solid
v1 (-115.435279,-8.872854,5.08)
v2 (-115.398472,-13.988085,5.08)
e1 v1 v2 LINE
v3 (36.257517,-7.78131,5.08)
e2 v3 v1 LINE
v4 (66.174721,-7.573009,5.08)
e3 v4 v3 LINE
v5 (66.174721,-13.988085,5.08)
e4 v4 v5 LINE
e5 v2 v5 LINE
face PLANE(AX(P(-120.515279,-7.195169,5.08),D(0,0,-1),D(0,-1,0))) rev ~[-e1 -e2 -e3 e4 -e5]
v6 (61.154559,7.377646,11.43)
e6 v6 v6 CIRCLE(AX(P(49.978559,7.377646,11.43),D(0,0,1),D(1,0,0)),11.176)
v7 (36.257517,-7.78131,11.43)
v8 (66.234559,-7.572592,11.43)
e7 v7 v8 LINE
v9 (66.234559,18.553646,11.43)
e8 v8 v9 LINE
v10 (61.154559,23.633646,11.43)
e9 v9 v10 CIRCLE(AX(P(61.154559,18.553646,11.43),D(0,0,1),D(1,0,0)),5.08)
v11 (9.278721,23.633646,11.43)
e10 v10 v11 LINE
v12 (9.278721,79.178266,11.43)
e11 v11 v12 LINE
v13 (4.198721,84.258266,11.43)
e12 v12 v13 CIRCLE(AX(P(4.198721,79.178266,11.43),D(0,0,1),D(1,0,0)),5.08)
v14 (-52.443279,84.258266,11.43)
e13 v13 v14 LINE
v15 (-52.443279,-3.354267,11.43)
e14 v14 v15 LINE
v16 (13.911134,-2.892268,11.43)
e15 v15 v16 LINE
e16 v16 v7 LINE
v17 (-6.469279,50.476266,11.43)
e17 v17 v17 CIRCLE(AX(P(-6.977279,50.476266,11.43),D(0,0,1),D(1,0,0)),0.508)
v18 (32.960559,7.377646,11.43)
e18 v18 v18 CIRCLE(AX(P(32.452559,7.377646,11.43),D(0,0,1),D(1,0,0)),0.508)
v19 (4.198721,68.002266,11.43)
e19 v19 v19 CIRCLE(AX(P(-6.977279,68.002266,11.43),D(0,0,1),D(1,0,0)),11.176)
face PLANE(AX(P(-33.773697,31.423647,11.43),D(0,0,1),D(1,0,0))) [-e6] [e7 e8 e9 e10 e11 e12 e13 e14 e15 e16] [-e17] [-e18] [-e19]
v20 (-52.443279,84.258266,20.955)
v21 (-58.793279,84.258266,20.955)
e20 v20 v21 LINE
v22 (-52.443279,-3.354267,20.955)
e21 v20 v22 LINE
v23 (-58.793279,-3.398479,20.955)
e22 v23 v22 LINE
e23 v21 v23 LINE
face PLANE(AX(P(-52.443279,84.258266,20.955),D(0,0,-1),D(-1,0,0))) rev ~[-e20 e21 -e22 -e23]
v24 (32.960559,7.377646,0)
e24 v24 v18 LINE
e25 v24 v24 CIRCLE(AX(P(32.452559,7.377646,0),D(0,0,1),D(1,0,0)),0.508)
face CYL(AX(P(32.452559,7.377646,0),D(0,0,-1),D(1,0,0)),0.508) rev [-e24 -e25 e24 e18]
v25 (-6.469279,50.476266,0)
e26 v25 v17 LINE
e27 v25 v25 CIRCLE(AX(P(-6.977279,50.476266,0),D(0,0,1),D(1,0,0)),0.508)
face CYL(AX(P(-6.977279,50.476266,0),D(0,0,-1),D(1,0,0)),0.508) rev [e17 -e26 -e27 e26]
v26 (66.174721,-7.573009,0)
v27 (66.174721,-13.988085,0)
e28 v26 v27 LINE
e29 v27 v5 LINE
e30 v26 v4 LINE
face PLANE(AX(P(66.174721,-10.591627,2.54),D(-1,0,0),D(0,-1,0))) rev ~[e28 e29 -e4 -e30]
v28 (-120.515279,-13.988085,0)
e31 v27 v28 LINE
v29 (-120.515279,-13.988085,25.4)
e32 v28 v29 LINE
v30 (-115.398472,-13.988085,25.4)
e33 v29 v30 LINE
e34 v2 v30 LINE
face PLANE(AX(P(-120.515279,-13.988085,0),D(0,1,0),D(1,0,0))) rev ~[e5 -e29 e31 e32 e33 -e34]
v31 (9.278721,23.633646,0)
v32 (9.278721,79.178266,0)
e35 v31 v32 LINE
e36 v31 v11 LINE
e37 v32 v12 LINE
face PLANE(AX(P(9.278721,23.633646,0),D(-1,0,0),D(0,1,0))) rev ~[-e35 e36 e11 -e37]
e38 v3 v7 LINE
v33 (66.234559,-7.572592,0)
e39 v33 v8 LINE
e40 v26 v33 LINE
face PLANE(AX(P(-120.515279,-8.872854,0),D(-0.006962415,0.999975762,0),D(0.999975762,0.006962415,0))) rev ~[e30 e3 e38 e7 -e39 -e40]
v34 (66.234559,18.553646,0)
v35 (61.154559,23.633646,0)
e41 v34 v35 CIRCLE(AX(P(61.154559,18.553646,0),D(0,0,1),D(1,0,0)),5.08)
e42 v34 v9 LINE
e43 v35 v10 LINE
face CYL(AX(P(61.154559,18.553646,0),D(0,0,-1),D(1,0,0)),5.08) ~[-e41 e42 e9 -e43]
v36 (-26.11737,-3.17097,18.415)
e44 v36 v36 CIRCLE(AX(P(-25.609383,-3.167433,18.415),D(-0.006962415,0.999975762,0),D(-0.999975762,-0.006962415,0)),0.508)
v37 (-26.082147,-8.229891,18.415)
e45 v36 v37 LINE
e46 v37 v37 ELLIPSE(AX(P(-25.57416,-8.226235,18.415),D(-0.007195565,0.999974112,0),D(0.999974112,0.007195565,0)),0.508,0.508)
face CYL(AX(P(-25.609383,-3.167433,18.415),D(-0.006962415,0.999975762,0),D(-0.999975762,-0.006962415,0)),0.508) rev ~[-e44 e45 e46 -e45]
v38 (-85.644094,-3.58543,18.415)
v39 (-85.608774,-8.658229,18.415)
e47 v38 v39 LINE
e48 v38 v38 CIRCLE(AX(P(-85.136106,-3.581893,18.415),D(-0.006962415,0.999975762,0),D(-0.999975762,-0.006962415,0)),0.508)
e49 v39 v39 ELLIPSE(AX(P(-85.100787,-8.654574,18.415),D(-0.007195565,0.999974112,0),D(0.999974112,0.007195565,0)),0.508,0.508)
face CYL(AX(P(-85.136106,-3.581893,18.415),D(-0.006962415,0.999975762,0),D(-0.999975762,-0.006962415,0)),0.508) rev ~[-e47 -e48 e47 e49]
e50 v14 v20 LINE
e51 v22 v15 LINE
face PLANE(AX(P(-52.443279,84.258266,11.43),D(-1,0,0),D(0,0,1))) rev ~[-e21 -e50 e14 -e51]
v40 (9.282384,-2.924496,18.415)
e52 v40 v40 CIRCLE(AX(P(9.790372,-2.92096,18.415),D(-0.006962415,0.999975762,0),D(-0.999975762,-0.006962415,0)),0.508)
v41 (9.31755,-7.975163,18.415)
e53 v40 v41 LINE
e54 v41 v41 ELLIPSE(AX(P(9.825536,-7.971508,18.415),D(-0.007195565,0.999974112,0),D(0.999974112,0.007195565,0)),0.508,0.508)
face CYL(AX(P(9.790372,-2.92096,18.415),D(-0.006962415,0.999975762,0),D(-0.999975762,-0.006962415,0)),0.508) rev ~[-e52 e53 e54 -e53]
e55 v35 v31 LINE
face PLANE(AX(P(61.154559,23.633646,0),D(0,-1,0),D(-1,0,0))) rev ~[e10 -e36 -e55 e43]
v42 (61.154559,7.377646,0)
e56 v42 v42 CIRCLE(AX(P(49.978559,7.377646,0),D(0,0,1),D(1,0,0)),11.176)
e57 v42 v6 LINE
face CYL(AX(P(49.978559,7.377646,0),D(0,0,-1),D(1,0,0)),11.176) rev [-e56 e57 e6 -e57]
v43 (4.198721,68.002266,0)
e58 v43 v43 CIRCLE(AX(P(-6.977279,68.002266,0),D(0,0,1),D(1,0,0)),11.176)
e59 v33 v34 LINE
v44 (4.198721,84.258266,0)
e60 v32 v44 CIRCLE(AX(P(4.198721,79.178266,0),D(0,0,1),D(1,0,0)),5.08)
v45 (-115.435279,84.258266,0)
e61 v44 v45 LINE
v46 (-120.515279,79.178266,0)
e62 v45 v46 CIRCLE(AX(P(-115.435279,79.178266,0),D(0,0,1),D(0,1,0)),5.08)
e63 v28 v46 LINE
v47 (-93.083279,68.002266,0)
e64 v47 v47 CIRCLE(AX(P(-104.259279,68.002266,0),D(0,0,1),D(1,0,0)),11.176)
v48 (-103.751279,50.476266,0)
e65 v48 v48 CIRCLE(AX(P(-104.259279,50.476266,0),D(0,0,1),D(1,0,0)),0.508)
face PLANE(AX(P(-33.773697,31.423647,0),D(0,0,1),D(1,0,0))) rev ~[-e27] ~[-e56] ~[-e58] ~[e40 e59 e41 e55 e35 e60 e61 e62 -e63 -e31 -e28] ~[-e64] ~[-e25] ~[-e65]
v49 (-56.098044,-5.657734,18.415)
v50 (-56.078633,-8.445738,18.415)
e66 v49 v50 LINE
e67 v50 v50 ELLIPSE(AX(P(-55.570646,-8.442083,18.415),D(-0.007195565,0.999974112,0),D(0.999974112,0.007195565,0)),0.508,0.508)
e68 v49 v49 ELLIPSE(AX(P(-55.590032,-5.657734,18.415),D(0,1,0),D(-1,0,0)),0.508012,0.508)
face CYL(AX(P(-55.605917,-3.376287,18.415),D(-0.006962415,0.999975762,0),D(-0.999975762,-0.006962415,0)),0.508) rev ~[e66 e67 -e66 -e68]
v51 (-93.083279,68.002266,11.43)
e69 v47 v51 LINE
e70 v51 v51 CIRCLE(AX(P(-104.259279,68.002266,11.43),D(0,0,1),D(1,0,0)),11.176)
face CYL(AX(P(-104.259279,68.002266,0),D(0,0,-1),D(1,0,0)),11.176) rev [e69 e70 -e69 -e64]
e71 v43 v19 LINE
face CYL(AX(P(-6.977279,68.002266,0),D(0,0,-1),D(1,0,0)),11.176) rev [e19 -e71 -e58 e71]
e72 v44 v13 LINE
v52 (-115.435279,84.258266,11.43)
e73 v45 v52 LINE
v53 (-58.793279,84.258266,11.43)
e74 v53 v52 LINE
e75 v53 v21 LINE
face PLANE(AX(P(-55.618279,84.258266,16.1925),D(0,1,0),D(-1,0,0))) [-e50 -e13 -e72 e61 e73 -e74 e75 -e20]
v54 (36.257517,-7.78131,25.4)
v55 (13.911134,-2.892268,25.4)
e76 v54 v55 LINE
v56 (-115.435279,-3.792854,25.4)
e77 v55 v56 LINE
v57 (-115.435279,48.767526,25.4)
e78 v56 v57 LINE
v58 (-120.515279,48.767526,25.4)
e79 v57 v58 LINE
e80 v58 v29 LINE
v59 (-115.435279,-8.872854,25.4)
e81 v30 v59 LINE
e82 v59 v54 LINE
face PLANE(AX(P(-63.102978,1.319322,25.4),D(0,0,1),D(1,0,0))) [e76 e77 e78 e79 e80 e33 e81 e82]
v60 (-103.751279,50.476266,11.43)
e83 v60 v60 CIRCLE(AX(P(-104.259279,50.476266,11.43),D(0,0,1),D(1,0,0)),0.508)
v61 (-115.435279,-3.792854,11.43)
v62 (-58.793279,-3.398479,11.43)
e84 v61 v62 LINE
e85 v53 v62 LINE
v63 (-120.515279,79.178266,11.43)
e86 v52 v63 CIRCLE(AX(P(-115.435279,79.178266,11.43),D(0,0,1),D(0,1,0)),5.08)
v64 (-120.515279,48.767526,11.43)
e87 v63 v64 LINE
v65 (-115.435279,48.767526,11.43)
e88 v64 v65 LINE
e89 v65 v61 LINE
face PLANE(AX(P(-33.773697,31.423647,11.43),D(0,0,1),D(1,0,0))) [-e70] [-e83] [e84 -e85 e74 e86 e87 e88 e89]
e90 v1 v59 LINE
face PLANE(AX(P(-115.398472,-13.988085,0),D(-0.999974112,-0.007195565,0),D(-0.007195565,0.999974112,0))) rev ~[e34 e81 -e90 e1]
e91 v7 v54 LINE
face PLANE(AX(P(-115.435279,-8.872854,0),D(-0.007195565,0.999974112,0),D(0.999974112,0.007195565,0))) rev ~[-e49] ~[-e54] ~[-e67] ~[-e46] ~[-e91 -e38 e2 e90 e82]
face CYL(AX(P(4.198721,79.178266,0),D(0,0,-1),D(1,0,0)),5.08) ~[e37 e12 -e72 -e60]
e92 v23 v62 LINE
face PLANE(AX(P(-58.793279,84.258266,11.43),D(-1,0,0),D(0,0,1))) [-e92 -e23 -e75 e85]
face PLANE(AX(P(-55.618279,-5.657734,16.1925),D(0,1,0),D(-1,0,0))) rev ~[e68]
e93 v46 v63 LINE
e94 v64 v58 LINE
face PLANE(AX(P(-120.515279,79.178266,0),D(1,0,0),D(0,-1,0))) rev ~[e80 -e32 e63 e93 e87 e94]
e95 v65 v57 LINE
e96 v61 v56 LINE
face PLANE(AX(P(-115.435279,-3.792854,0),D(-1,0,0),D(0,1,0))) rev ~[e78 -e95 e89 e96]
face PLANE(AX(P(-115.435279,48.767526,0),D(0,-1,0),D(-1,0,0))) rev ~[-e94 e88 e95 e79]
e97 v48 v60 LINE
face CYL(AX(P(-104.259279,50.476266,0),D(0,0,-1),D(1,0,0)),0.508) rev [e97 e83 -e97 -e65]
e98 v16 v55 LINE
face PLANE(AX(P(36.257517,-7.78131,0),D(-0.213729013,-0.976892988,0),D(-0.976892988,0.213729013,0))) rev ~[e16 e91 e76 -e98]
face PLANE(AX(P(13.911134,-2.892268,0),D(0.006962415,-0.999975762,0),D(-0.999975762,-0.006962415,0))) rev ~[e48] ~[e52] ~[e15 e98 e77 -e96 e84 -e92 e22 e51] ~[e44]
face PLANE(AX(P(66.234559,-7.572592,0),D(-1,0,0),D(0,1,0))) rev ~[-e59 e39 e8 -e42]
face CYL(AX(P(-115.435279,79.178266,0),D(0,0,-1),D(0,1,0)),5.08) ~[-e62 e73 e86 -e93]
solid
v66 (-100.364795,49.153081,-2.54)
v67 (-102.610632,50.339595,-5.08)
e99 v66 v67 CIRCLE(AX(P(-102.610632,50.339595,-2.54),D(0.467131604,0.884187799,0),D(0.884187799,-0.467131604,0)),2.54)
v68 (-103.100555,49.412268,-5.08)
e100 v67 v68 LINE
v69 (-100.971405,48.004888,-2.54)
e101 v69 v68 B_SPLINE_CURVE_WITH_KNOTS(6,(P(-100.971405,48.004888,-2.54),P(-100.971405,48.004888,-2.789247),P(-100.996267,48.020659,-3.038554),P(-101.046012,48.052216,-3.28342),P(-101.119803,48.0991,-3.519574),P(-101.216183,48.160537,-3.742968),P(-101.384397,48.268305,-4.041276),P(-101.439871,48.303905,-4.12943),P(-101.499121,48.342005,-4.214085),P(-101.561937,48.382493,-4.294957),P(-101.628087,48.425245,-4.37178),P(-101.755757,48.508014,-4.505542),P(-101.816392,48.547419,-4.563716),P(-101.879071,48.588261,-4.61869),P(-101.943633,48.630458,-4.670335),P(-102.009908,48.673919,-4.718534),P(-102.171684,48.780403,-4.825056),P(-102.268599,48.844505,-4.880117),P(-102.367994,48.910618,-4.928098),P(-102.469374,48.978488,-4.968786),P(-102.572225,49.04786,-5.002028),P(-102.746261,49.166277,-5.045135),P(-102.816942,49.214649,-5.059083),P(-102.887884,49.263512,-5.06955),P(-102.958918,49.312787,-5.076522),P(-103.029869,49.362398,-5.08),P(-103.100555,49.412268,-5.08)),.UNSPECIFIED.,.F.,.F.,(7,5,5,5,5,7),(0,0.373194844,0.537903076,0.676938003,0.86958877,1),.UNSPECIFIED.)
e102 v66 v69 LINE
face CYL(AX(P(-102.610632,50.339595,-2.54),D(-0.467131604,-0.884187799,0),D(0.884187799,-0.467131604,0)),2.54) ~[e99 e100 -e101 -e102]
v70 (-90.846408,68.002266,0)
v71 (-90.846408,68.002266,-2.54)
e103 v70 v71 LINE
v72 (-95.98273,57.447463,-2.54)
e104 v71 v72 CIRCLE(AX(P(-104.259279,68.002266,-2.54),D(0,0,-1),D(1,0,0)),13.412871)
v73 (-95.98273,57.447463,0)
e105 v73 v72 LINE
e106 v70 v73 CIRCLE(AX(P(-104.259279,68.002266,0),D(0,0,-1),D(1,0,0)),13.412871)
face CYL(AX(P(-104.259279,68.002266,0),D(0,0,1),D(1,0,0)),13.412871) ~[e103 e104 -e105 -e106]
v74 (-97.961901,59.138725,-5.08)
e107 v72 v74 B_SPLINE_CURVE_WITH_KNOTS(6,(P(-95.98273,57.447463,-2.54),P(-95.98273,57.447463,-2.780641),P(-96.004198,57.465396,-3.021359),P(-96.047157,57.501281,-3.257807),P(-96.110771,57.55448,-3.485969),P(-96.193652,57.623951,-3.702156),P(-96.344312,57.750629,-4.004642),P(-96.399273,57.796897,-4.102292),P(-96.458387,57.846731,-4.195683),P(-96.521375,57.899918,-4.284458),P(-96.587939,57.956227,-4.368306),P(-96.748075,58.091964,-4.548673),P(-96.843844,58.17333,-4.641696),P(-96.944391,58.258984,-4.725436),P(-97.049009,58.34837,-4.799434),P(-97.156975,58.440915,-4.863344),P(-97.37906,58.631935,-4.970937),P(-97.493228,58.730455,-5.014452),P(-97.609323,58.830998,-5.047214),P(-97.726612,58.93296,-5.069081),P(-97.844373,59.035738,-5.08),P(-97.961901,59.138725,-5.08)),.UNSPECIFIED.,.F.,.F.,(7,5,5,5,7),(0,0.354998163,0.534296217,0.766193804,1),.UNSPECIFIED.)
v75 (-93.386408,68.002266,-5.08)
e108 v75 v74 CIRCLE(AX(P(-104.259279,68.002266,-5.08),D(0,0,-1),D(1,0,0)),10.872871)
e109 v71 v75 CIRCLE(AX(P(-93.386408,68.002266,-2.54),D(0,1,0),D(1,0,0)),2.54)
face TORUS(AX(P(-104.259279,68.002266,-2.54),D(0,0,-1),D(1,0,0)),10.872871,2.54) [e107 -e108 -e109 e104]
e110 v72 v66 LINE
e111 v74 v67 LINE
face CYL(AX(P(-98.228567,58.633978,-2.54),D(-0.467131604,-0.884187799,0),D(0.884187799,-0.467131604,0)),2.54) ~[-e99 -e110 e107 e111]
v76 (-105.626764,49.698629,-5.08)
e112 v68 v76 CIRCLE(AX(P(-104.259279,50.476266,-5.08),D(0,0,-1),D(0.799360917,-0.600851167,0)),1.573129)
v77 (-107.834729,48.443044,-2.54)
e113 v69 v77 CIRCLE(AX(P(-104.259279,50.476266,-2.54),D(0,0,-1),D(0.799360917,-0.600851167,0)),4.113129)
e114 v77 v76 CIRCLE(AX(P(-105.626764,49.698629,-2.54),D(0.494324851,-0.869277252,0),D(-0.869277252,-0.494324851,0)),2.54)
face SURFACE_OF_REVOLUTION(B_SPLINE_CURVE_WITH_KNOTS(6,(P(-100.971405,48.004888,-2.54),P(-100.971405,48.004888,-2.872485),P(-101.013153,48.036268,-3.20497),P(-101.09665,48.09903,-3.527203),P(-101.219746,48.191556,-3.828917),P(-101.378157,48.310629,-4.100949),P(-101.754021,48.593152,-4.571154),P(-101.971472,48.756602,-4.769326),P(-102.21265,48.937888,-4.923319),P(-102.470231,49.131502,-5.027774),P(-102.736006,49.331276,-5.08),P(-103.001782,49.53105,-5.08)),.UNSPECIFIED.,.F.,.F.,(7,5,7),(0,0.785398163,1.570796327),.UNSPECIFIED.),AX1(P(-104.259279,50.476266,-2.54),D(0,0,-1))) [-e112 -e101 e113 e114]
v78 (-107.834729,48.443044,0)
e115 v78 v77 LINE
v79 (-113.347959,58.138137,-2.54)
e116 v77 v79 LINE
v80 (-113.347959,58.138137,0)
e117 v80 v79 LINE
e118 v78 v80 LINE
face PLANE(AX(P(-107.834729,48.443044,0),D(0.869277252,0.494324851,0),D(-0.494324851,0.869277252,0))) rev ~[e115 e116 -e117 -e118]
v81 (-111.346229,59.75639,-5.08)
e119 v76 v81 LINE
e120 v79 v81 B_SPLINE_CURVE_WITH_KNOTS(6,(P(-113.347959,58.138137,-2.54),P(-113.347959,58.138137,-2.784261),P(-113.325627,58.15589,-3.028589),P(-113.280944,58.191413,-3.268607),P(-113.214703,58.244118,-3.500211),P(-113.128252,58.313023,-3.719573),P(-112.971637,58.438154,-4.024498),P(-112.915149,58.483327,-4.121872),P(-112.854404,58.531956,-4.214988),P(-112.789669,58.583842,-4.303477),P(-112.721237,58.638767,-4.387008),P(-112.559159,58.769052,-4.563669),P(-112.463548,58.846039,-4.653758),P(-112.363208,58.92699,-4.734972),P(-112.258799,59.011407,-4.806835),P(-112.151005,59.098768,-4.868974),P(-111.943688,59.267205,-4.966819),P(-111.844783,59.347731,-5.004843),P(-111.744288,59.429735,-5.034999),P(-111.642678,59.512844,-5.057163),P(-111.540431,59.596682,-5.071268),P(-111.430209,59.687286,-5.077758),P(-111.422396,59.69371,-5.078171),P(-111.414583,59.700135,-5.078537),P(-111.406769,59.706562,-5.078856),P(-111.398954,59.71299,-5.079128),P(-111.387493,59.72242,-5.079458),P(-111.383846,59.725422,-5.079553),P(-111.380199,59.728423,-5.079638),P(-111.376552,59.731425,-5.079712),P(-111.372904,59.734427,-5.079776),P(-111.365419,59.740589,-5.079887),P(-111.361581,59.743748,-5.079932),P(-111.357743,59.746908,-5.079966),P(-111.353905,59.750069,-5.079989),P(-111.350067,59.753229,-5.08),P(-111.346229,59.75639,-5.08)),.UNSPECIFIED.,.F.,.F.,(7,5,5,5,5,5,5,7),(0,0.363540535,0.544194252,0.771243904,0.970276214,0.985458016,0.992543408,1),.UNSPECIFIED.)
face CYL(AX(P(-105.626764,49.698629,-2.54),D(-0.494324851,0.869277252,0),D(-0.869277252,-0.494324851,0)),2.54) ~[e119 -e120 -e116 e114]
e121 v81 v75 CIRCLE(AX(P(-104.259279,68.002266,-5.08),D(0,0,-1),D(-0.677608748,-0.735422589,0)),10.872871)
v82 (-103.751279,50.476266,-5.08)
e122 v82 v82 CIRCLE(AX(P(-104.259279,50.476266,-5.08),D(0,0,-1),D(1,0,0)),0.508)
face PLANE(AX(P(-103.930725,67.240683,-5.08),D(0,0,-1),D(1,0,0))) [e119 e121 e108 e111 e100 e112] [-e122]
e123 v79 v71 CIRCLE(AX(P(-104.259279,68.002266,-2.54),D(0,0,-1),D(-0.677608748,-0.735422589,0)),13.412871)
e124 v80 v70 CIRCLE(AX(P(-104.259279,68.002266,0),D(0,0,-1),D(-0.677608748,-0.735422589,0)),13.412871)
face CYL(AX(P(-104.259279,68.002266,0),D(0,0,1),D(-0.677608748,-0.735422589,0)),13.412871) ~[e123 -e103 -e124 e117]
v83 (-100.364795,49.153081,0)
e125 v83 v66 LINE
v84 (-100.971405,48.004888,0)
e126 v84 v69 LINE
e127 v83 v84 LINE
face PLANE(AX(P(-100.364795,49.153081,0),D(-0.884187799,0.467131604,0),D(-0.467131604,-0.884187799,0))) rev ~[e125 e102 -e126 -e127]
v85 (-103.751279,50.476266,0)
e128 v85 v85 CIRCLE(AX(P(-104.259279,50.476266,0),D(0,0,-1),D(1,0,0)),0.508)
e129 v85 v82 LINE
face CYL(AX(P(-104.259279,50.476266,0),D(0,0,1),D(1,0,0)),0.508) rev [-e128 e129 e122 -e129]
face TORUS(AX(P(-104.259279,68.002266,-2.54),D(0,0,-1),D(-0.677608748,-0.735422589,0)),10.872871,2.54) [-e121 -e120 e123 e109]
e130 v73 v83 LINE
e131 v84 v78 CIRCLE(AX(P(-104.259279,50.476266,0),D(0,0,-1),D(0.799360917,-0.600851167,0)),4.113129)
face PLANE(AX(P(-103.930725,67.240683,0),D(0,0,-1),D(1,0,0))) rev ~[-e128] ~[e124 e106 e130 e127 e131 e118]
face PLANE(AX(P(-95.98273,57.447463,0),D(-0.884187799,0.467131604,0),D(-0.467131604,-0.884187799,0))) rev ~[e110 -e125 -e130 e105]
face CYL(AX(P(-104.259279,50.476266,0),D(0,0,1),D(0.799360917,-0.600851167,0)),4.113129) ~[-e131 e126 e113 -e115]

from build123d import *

# Parameters (mm, degrees)
F0_R      = 0.508
F0_R_2    = 11.176
F1_DEPTH  = 11.43
F3_DEPTH  = 25.4
F4_R      = 0.508
F5_DEPTH  = 11.4608454435
F6_W      = 6.7929165438
F6_H      = 5.08
F7_DEPTH  = 186.69
F8_W      = 6.35
F8_H      = 9.525
F9_DEPTH  = 89.916
F10_R     = 11.176
F10_R_2   = 0.508
F11_DEPTH = 5.08
F12_R     = 2.54


with BuildPart() as f1:
    # F0 (on Top) → F1 (new body)
    with BuildSketch(Plane.XY):
        with BuildLine():
            Line((9.2787205281, 23.6336458474), (9.2787205281, 79.1782657933))
            ThreePointArc((9.2787205281, 79.1782657933), (7.7908229766, 82.7703682418), (4.1987205281, 84.2582657933))
            Line((4.1987205281, 84.2582657933), (-115.4352794719, 84.2582657933))
            ThreePointArc((-115.4352794719, 84.2582657933), (-119.0273819203, 82.7703682418), (-120.5152794719, 79.1782657933))
            Line((-120.5152794719, 79.1782657933), (-120.5152794719, -8.872853592))
            Line((-120.5152794719, -8.872853592), (66.2345588207, -7.5725922361))
            Line((66.2345588207, -7.5725922361), (66.2345588207, 18.5536458474))
            ThreePointArc((66.2345588207, 18.5536458474), (64.7466612692, 22.1457482959), (61.1545588207, 23.6336458474))
            Line((61.1545588207, 23.6336458474), (9.2787205281, 23.6336458474))
        make_face()
        with Locations((32.4525588207, 7.3776458474)):
            Circle(F0_R, mode=Mode.SUBTRACT)
        with Locations((49.9785588207, 7.3776458474)):
            Circle(F0_R_2, mode=Mode.SUBTRACT)
        with Locations((-104.2592794719, 50.4762657933)):
            Circle(F0_R, mode=Mode.SUBTRACT)
        with Locations((-104.2592794719, 68.0022657933)):
            Circle(F0_R_2, mode=Mode.SUBTRACT)
        with Locations((-6.9772794719, 50.4762657933)):
            Circle(F0_R, mode=Mode.SUBTRACT)
        with Locations((-6.9772794719, 68.0022657933)):
            Circle(F0_R_2, mode=Mode.SUBTRACT)
    extrude(amount=F1_DEPTH)

    # F2 (on Top) → F3 (join)
    with BuildSketch(Plane.XY):
        Polygon((-115.4352794719, 48.7675257027), (-120.5152794719, 48.7675257027), (-120.5152794719, -13.9880853735), (-115.3984715341, -13.9880853735), (-115.4352794719, -8.872853592), (36.2575173668, -7.7813098924), (13.9111343974, -2.8922683759), (-115.4352794719, -3.792853592), align=None)
    extrude(amount=F3_DEPTH)

    # F4 (on face) → F5 (cut, through all)
    with BuildSketch(Plane(origin=(0.0208110294, -2.9889809132, 0), x_dir=(-0.9999757621, -0.0069624148, 0), z_dir=(-0.0069624148, 0.9999757621, 0))):
        with Locations((-9.7697973251, 18.415)):
            Circle(F4_R)
        with Locations((25.6308149546, 18.415)):
            Circle(F4_R)
        with Locations((55.6280761957, 18.415)):
            Circle(F4_R)
        with Locations((85.1589813828, 18.415)):
            Circle(F4_R)
    extrude(amount=-F5_DEPTH, mode=Mode.SUBTRACT)

    # F6 (on face) → F7 (join)
    with BuildSketch(Plane(origin=(-120.5152794719, 0, 0), x_dir=(0, -1, 0), z_dir=(-1, 0, 0))):
        with Locations((10.5916271016, 2.54)):
            Rectangle(F6_W, F6_H)
    extrude(amount=-F7_DEPTH)

    # F8 (on face) → F9 (join)
    with BuildSketch(Plane(origin=(0, 84.2582657933, 0), x_dir=(-1, 0, 0), z_dir=(0, 1, 0))):
        with Locations((55.6182794719, 16.1925)):
            Rectangle(F8_W, F8_H)
    extrude(amount=-F9_DEPTH)


with BuildPart() as f11:
    # F10 (on face) → F11 (new body)
    with BuildSketch(Plane(origin=(0, 0, 0), x_dir=(1, 0, 0), z_dir=(0, 0, -1))):
        with BuildLine():
            ThreePointArc((-113.3479585097, -58.1381371295), (-109.6444367223, -80.286613653), (-90.8464080064, -68.0022657933))
            ThreePointArc((-90.8464080064, -68.0022657933), (-92.1986532448, -62.1331588801), (-95.9827303886, -57.447463274))
            ThreePointArc((-95.9827303886, -57.447463274), (-99.8812141792, -55.3240299049), (-104.2592794719, -54.5893943279))
            ThreePointArc((-104.2592794719, -54.5893943279), (-109.1377439363, -55.5080389098), (-113.3479585097, -58.1381371295))
        make_face()
        with Locations((-104.2592794719, -68.0022657933)):
            Circle(F10_R, mode=Mode.SUBTRACT)
        with BuildLine():
            ThreePointArc((-104.2592794719, -54.5893943279), (-99.8812141792, -55.3240299049), (-95.9827303886, -57.447463274))
            Line((-95.9827303886, -57.447463274), (-100.364795277, -49.1530805465))
            ThreePointArc((-100.364795277, -49.1530805465), (-100.2011801378, -49.80570175), (-100.1461509373, -50.4762657933))
            ThreePointArc((-100.1461509373, -50.4762657933), (-101.3508583932, -53.384686872), (-104.2592794719, -54.5893943279))
        make_face()
        with BuildLine():
            Line((-107.8347285432, -48.4430441429), (-113.3479585097, -58.1381371295))
            ThreePointArc((-113.3479585097, -58.1381371295), (-109.1377439363, -55.5080389098), (-104.2592794719, -54.5893943279))
            ThreePointArc((-104.2592794719, -54.5893943279), (-107.8146084531, -52.5444684374), (-107.8347285432, -48.4430441429))
        make_face()
        with BuildLine():
            ThreePointArc((-107.8347285432, -48.4430441429), (-107.8146084531, -52.5444684374), (-104.2592794719, -54.5893943279))
            ThreePointArc((-104.2592794719, -54.5893943279), (-101.3508583932, -53.384686872), (-100.1461509373, -50.4762657933))
            ThreePointArc((-100.1461509373, -50.4762657933), (-100.2011801378, -49.80570175), (-100.364795277, -49.1530805465))
            Line((-100.364795277, -49.1530805465), (-100.9714052762, -48.0048877131))
            ThreePointArc((-100.9714052762, -48.0048877131), (-104.5213292601, -46.3714934184), (-107.8347285432, -48.4430441429))
        make_face()
        with Locations((-104.2592794719, -50.4762657933)):
            Circle(F10_R_2, mode=Mode.SUBTRACT)
        with Locations((-104.2592794719, -68.0022657933)):
            Circle(F10_R)
    extrude(amount=F11_DEPTH)

    # F12
    f12_edges = [f11.edges().sort_by_distance(p)[0] for p in [
        (-103.726226, 81.404541, -5.08),
        (-98.477068, 52.726175, -5.08),
        (-110.591344, 53.290591, -5.08),
        (-104.521329, 46.371493, -5.08),
    ]]
    fillet(f12_edges, radius=F12_R)


solid = Compound([f1.part, f11.part])
